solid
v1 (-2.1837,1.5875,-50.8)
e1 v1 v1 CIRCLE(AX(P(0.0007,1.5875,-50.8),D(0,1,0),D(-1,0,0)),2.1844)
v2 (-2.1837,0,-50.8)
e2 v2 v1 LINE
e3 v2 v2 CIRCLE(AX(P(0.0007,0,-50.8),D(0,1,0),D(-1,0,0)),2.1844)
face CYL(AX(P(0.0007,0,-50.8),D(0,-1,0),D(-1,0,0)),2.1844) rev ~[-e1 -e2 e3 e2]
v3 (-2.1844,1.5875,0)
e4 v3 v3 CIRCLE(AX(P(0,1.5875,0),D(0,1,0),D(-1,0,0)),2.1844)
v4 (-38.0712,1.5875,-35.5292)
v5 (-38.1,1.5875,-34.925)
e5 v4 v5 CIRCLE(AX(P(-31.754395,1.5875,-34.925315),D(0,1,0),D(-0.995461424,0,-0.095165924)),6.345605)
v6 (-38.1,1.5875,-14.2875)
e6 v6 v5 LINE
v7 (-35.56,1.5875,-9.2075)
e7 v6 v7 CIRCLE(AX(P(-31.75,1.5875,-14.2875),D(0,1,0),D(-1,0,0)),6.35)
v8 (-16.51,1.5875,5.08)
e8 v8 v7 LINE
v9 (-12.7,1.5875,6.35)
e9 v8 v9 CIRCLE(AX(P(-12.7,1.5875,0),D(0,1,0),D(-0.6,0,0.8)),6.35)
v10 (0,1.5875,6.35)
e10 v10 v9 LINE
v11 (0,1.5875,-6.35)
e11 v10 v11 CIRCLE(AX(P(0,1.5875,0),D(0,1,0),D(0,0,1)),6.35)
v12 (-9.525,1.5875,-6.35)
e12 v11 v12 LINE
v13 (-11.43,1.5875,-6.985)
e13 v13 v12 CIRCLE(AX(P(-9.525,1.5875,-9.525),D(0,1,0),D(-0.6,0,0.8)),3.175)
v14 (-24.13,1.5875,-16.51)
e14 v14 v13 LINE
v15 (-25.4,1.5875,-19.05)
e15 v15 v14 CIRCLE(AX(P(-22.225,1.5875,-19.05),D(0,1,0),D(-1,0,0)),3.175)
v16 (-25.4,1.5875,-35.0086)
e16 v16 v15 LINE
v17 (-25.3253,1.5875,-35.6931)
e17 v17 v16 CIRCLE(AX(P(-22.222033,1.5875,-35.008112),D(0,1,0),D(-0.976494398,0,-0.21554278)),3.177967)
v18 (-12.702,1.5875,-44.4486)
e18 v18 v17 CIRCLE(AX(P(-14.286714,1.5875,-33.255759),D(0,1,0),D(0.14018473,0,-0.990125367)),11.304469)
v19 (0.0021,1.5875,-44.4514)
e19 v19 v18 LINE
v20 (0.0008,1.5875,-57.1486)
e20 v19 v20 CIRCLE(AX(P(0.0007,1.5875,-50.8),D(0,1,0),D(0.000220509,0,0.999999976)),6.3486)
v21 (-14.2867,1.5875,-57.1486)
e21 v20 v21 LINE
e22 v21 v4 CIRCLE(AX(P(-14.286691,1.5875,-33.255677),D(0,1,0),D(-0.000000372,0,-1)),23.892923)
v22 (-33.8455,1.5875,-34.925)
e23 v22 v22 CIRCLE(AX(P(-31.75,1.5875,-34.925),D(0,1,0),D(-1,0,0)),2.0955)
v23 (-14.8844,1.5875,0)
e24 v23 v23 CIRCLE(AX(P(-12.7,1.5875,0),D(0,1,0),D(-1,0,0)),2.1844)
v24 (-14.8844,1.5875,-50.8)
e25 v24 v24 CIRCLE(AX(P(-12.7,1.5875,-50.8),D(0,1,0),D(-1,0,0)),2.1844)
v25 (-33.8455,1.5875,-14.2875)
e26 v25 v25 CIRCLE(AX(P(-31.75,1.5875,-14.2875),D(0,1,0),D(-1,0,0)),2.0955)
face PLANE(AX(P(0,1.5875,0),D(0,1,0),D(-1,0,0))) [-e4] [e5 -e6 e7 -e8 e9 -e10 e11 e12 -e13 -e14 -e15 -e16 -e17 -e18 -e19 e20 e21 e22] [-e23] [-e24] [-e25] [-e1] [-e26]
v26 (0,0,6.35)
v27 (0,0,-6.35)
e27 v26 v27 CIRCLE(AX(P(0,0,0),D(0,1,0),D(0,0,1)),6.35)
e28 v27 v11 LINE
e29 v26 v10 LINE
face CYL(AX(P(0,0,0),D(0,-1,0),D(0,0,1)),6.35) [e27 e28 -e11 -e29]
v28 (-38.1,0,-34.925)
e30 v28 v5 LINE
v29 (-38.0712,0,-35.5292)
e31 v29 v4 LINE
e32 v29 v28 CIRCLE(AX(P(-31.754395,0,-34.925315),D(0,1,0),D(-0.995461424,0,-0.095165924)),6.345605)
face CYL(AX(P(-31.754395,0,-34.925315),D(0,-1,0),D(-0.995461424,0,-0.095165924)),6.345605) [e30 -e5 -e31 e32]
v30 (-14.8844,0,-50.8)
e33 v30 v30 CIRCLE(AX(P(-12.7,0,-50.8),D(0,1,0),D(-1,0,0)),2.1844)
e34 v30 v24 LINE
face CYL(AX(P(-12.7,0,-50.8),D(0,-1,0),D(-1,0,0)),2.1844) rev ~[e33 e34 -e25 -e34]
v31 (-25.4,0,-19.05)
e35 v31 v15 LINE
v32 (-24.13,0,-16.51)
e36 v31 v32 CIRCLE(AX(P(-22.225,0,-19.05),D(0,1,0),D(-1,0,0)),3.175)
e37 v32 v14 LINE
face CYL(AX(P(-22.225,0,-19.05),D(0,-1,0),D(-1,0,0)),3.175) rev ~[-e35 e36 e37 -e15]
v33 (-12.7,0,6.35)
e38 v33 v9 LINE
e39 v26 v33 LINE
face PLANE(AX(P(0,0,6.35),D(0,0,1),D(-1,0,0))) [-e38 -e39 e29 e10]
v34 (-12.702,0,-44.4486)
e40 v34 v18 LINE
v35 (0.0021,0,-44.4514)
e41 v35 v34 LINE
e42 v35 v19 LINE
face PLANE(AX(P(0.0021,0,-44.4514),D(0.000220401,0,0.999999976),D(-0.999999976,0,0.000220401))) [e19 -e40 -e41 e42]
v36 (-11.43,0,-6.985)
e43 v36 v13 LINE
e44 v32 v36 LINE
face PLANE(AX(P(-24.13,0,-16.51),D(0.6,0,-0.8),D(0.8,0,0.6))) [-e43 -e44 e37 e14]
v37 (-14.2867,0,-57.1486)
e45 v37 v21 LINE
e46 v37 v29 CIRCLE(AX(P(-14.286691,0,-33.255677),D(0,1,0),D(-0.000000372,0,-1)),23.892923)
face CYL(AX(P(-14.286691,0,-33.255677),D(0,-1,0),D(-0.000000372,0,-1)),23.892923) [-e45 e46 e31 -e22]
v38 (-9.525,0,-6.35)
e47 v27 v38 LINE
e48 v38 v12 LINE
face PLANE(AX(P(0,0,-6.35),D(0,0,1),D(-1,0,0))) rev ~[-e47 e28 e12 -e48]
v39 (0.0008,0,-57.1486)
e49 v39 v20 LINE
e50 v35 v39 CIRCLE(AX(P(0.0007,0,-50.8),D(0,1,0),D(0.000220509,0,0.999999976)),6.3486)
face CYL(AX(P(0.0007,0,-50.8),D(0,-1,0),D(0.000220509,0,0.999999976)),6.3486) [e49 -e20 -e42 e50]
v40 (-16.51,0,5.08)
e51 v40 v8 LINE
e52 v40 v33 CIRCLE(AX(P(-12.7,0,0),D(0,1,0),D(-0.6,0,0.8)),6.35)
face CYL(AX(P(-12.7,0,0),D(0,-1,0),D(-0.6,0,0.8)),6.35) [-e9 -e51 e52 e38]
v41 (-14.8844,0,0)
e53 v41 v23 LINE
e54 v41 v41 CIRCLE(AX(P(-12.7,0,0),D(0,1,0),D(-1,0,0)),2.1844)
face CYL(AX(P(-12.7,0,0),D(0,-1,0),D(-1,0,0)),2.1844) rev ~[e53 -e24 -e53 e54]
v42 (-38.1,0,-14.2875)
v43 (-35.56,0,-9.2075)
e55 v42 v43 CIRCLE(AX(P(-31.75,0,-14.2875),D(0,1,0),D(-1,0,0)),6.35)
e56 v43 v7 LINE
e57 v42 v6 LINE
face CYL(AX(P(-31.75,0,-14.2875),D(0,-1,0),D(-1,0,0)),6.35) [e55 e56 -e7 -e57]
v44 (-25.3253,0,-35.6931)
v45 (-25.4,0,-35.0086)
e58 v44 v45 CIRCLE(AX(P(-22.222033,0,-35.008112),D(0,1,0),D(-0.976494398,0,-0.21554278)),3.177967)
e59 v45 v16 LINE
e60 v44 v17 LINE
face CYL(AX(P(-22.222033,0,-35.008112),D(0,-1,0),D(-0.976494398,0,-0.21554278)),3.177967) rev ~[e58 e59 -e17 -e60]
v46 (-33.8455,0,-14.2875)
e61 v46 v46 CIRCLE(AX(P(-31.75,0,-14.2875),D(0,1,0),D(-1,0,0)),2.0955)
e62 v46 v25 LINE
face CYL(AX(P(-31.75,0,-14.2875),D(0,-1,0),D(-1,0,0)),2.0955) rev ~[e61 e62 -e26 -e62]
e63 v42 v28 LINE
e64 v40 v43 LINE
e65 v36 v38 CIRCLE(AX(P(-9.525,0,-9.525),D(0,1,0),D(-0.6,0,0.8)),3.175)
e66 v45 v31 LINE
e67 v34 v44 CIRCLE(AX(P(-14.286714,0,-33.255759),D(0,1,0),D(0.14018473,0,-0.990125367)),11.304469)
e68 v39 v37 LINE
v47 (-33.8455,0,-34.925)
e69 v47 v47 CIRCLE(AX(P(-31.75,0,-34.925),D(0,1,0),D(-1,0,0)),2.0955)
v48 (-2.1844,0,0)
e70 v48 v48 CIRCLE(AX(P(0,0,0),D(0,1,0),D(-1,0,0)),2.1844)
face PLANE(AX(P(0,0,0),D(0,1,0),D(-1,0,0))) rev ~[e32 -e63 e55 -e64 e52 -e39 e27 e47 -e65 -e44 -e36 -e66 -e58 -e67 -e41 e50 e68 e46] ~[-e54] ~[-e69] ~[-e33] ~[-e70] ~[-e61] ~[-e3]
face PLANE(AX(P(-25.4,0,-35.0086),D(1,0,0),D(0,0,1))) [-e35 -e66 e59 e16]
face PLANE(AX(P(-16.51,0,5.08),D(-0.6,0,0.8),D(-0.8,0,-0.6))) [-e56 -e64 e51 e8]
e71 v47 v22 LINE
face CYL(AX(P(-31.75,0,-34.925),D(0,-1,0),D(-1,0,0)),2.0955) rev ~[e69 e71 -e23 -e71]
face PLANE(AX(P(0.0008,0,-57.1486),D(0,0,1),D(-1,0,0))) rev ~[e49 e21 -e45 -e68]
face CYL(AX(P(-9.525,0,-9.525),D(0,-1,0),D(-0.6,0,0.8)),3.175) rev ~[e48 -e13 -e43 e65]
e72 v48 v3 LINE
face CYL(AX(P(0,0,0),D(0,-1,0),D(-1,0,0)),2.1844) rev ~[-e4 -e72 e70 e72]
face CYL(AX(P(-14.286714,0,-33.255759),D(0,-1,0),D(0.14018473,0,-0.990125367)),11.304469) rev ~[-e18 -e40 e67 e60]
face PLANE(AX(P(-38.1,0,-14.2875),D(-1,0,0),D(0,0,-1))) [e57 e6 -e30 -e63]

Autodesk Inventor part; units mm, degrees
ref_plane "YZ Plane" through (0, 0, 0) normal (1, 0, 0) x (0, 1, 0)
ref_plane "XZ Plane" through (0, 0, 0) normal (0, 1, 0) x (-1, 0, 0)
ref_plane "XY Plane" through (0, 0, 0) normal (0, 0, 1) x (1, 0, 0)
sketch "gusset" plane through (0, 0, 0) normal (0, 0, 1) x (1, 0, 0)
  circle A0 centre (-8.9225, 14.8571) radius 2.1844
  circle A1 centre (-21.6225, 14.8571) radius 2.1844
  arc A2 (-21.6225, 21.2071) -> (-21.6225, 8.5071) centre (-21.6225, 14.8571) ccw
  arc A3 (-5.1125, 19.9371) -> (-8.9225, 21.2071) centre (-8.9225, 14.8571) ccw
  line L0 (16.4775, 0.5696) -> (16.4775, -20.0679)
  line L1 (3.7775, -20.1515) -> (3.7775, -4.1929)
  line L2 (2.5075, -1.6529) -> (-10.1925, 7.8721)
  line L3 (-21.6225, 8.5071) -> (-12.0975, 8.5071)
  line L4 (-21.6225, 21.2071) -> (-8.9225, 21.2071)
  arc A4 (16.4775, 0.5696) -> (13.9375, 5.6496) centre (10.1275, 0.5696) ccw
  line L5 (-5.1125, 19.9371) -> (13.9375, 5.6496)
  circle A5 centre (-21.6232, -35.9429) radius 2.1844
  circle A6 centre (-8.9225, -35.9429) radius 2.1844
  line L6 (-21.6246, -29.5943) -> (-8.9205, -29.5916)
  line L7 (-21.6233, -42.2916) -> (-7.3358, -42.2916)
  arc A7 (-21.6246, -29.5943) -> (-21.6233, -42.2916) centre (-21.6232, -35.9429) ccw
  circle A8 centre (10.1275, 0.5696) radius 2.0955
  circle A9 centre (10.1275, -20.0679) radius 2.0955
  arc A10 (3.7775, -4.1929) -> (2.5075, -1.6529) centre (0.6025, -4.1929) ccw
  arc A11 (-10.1925, 7.8721) -> (-12.0975, 8.5071) centre (-12.0975, 5.3321) ccw
  arc A12 (-7.3358, -42.2916) -> (16.4487, -20.6722) centre (-7.3358, -18.3986) ccw
  arc A13 (16.4487, -20.6722) -> (16.4775, -20.0679) centre (10.1275, -20.0679) ccw
  arc A14 (-8.9205, -29.5916) -> (3.7028, -20.8361) centre (-7.3358, -18.3986) ccw
  arc A15 (3.7028, -20.8361) -> (3.7775, -20.1515) centre (0.6025, -20.1515) ccw
  point P0 (-7.0147, -10.522)
  point P1 (16.4775, -20.3474)
  point P2 (3.7775, -20.4691)
  point P3 (4.4125, 12.7933)
  dimension "d0" = 12.7
  dimension "d2" = 12.7
  dimension "d3" = 4.191
  dimension "d4" = 3.175
  dimension "d8" = 12.7
  dimension "d12" = 14.2875
  dimension "d13" = 6.35
  dimension "d14" = 15.875
  dimension "d15" = 3.175
sketch "Sketch1" plane through (0, 0, 0) normal (0, 1, 0) x (-1, 0, 0)
  circle A0 centre (12.7, 0) radius 2.1844
  circle A1 centre (0, 0) radius 2.1844
  arc A2 (0, 6.35) -> (0, -6.35) centre (0, 0) ccw
  arc A3 (16.51, 5.08) -> (12.7, 6.35) centre (12.7, 0) ccw
  line L0 (38.1, -14.2875) -> (38.1, -34.925)
  line L1 (25.4, -35.0086) -> (25.4, -19.05)
  line L2 (24.13, -16.51) -> (11.43, -6.985)
  line L3 (0, -6.35) -> (9.525, -6.35)
  line L4 (0, 6.35) -> (12.7, 6.35)
  arc A4 (38.1, -14.2875) -> (35.56, -9.2075) centre (31.75, -14.2875) ccw
  line L5 (16.51, 5.08) -> (35.56, -9.2075)
  circle A5 centre (-0.0007, -50.8) radius 2.1844
  circle A6 centre (12.7, -50.8) radius 2.1844
  line L6 (-0.0021, -44.4514) -> (12.702, -44.4486)
  line L7 (-0.0008, -57.1486) -> (14.2867, -57.1486)
  arc A7 (-0.0021, -44.4514) -> (-0.0008, -57.1486) centre (-0.0007, -50.8) ccw
  circle A8 centre (31.75, -14.2875) radius 2.0955
  circle A9 centre (31.75, -34.925) radius 2.0955
  arc A10 (25.4, -19.05) -> (24.13, -16.51) centre (22.225, -19.05) ccw
  arc A11 (11.43, -6.985) -> (9.525, -6.35) centre (9.525, -9.525) ccw
  arc A12 (14.2867, -57.1486) -> (38.0712, -35.5292) centre (14.2867, -33.2557) ccw
  arc A13 (38.0712, -35.5292) -> (38.1, -34.925) centre (31.75, -34.925) ccw
  arc A14 (12.702, -44.4486) -> (25.3253, -35.6931) centre (14.2867, -33.2557) ccw
  arc A15 (25.3253, -35.6931) -> (25.4, -35.0086) centre (22.225, -35.0086) ccw
extrude "Extrusion1" add sketch "Sketch1" along normal blind 1.5875
properties part number "Rear Gusset" material "Acetal Resin, White"
